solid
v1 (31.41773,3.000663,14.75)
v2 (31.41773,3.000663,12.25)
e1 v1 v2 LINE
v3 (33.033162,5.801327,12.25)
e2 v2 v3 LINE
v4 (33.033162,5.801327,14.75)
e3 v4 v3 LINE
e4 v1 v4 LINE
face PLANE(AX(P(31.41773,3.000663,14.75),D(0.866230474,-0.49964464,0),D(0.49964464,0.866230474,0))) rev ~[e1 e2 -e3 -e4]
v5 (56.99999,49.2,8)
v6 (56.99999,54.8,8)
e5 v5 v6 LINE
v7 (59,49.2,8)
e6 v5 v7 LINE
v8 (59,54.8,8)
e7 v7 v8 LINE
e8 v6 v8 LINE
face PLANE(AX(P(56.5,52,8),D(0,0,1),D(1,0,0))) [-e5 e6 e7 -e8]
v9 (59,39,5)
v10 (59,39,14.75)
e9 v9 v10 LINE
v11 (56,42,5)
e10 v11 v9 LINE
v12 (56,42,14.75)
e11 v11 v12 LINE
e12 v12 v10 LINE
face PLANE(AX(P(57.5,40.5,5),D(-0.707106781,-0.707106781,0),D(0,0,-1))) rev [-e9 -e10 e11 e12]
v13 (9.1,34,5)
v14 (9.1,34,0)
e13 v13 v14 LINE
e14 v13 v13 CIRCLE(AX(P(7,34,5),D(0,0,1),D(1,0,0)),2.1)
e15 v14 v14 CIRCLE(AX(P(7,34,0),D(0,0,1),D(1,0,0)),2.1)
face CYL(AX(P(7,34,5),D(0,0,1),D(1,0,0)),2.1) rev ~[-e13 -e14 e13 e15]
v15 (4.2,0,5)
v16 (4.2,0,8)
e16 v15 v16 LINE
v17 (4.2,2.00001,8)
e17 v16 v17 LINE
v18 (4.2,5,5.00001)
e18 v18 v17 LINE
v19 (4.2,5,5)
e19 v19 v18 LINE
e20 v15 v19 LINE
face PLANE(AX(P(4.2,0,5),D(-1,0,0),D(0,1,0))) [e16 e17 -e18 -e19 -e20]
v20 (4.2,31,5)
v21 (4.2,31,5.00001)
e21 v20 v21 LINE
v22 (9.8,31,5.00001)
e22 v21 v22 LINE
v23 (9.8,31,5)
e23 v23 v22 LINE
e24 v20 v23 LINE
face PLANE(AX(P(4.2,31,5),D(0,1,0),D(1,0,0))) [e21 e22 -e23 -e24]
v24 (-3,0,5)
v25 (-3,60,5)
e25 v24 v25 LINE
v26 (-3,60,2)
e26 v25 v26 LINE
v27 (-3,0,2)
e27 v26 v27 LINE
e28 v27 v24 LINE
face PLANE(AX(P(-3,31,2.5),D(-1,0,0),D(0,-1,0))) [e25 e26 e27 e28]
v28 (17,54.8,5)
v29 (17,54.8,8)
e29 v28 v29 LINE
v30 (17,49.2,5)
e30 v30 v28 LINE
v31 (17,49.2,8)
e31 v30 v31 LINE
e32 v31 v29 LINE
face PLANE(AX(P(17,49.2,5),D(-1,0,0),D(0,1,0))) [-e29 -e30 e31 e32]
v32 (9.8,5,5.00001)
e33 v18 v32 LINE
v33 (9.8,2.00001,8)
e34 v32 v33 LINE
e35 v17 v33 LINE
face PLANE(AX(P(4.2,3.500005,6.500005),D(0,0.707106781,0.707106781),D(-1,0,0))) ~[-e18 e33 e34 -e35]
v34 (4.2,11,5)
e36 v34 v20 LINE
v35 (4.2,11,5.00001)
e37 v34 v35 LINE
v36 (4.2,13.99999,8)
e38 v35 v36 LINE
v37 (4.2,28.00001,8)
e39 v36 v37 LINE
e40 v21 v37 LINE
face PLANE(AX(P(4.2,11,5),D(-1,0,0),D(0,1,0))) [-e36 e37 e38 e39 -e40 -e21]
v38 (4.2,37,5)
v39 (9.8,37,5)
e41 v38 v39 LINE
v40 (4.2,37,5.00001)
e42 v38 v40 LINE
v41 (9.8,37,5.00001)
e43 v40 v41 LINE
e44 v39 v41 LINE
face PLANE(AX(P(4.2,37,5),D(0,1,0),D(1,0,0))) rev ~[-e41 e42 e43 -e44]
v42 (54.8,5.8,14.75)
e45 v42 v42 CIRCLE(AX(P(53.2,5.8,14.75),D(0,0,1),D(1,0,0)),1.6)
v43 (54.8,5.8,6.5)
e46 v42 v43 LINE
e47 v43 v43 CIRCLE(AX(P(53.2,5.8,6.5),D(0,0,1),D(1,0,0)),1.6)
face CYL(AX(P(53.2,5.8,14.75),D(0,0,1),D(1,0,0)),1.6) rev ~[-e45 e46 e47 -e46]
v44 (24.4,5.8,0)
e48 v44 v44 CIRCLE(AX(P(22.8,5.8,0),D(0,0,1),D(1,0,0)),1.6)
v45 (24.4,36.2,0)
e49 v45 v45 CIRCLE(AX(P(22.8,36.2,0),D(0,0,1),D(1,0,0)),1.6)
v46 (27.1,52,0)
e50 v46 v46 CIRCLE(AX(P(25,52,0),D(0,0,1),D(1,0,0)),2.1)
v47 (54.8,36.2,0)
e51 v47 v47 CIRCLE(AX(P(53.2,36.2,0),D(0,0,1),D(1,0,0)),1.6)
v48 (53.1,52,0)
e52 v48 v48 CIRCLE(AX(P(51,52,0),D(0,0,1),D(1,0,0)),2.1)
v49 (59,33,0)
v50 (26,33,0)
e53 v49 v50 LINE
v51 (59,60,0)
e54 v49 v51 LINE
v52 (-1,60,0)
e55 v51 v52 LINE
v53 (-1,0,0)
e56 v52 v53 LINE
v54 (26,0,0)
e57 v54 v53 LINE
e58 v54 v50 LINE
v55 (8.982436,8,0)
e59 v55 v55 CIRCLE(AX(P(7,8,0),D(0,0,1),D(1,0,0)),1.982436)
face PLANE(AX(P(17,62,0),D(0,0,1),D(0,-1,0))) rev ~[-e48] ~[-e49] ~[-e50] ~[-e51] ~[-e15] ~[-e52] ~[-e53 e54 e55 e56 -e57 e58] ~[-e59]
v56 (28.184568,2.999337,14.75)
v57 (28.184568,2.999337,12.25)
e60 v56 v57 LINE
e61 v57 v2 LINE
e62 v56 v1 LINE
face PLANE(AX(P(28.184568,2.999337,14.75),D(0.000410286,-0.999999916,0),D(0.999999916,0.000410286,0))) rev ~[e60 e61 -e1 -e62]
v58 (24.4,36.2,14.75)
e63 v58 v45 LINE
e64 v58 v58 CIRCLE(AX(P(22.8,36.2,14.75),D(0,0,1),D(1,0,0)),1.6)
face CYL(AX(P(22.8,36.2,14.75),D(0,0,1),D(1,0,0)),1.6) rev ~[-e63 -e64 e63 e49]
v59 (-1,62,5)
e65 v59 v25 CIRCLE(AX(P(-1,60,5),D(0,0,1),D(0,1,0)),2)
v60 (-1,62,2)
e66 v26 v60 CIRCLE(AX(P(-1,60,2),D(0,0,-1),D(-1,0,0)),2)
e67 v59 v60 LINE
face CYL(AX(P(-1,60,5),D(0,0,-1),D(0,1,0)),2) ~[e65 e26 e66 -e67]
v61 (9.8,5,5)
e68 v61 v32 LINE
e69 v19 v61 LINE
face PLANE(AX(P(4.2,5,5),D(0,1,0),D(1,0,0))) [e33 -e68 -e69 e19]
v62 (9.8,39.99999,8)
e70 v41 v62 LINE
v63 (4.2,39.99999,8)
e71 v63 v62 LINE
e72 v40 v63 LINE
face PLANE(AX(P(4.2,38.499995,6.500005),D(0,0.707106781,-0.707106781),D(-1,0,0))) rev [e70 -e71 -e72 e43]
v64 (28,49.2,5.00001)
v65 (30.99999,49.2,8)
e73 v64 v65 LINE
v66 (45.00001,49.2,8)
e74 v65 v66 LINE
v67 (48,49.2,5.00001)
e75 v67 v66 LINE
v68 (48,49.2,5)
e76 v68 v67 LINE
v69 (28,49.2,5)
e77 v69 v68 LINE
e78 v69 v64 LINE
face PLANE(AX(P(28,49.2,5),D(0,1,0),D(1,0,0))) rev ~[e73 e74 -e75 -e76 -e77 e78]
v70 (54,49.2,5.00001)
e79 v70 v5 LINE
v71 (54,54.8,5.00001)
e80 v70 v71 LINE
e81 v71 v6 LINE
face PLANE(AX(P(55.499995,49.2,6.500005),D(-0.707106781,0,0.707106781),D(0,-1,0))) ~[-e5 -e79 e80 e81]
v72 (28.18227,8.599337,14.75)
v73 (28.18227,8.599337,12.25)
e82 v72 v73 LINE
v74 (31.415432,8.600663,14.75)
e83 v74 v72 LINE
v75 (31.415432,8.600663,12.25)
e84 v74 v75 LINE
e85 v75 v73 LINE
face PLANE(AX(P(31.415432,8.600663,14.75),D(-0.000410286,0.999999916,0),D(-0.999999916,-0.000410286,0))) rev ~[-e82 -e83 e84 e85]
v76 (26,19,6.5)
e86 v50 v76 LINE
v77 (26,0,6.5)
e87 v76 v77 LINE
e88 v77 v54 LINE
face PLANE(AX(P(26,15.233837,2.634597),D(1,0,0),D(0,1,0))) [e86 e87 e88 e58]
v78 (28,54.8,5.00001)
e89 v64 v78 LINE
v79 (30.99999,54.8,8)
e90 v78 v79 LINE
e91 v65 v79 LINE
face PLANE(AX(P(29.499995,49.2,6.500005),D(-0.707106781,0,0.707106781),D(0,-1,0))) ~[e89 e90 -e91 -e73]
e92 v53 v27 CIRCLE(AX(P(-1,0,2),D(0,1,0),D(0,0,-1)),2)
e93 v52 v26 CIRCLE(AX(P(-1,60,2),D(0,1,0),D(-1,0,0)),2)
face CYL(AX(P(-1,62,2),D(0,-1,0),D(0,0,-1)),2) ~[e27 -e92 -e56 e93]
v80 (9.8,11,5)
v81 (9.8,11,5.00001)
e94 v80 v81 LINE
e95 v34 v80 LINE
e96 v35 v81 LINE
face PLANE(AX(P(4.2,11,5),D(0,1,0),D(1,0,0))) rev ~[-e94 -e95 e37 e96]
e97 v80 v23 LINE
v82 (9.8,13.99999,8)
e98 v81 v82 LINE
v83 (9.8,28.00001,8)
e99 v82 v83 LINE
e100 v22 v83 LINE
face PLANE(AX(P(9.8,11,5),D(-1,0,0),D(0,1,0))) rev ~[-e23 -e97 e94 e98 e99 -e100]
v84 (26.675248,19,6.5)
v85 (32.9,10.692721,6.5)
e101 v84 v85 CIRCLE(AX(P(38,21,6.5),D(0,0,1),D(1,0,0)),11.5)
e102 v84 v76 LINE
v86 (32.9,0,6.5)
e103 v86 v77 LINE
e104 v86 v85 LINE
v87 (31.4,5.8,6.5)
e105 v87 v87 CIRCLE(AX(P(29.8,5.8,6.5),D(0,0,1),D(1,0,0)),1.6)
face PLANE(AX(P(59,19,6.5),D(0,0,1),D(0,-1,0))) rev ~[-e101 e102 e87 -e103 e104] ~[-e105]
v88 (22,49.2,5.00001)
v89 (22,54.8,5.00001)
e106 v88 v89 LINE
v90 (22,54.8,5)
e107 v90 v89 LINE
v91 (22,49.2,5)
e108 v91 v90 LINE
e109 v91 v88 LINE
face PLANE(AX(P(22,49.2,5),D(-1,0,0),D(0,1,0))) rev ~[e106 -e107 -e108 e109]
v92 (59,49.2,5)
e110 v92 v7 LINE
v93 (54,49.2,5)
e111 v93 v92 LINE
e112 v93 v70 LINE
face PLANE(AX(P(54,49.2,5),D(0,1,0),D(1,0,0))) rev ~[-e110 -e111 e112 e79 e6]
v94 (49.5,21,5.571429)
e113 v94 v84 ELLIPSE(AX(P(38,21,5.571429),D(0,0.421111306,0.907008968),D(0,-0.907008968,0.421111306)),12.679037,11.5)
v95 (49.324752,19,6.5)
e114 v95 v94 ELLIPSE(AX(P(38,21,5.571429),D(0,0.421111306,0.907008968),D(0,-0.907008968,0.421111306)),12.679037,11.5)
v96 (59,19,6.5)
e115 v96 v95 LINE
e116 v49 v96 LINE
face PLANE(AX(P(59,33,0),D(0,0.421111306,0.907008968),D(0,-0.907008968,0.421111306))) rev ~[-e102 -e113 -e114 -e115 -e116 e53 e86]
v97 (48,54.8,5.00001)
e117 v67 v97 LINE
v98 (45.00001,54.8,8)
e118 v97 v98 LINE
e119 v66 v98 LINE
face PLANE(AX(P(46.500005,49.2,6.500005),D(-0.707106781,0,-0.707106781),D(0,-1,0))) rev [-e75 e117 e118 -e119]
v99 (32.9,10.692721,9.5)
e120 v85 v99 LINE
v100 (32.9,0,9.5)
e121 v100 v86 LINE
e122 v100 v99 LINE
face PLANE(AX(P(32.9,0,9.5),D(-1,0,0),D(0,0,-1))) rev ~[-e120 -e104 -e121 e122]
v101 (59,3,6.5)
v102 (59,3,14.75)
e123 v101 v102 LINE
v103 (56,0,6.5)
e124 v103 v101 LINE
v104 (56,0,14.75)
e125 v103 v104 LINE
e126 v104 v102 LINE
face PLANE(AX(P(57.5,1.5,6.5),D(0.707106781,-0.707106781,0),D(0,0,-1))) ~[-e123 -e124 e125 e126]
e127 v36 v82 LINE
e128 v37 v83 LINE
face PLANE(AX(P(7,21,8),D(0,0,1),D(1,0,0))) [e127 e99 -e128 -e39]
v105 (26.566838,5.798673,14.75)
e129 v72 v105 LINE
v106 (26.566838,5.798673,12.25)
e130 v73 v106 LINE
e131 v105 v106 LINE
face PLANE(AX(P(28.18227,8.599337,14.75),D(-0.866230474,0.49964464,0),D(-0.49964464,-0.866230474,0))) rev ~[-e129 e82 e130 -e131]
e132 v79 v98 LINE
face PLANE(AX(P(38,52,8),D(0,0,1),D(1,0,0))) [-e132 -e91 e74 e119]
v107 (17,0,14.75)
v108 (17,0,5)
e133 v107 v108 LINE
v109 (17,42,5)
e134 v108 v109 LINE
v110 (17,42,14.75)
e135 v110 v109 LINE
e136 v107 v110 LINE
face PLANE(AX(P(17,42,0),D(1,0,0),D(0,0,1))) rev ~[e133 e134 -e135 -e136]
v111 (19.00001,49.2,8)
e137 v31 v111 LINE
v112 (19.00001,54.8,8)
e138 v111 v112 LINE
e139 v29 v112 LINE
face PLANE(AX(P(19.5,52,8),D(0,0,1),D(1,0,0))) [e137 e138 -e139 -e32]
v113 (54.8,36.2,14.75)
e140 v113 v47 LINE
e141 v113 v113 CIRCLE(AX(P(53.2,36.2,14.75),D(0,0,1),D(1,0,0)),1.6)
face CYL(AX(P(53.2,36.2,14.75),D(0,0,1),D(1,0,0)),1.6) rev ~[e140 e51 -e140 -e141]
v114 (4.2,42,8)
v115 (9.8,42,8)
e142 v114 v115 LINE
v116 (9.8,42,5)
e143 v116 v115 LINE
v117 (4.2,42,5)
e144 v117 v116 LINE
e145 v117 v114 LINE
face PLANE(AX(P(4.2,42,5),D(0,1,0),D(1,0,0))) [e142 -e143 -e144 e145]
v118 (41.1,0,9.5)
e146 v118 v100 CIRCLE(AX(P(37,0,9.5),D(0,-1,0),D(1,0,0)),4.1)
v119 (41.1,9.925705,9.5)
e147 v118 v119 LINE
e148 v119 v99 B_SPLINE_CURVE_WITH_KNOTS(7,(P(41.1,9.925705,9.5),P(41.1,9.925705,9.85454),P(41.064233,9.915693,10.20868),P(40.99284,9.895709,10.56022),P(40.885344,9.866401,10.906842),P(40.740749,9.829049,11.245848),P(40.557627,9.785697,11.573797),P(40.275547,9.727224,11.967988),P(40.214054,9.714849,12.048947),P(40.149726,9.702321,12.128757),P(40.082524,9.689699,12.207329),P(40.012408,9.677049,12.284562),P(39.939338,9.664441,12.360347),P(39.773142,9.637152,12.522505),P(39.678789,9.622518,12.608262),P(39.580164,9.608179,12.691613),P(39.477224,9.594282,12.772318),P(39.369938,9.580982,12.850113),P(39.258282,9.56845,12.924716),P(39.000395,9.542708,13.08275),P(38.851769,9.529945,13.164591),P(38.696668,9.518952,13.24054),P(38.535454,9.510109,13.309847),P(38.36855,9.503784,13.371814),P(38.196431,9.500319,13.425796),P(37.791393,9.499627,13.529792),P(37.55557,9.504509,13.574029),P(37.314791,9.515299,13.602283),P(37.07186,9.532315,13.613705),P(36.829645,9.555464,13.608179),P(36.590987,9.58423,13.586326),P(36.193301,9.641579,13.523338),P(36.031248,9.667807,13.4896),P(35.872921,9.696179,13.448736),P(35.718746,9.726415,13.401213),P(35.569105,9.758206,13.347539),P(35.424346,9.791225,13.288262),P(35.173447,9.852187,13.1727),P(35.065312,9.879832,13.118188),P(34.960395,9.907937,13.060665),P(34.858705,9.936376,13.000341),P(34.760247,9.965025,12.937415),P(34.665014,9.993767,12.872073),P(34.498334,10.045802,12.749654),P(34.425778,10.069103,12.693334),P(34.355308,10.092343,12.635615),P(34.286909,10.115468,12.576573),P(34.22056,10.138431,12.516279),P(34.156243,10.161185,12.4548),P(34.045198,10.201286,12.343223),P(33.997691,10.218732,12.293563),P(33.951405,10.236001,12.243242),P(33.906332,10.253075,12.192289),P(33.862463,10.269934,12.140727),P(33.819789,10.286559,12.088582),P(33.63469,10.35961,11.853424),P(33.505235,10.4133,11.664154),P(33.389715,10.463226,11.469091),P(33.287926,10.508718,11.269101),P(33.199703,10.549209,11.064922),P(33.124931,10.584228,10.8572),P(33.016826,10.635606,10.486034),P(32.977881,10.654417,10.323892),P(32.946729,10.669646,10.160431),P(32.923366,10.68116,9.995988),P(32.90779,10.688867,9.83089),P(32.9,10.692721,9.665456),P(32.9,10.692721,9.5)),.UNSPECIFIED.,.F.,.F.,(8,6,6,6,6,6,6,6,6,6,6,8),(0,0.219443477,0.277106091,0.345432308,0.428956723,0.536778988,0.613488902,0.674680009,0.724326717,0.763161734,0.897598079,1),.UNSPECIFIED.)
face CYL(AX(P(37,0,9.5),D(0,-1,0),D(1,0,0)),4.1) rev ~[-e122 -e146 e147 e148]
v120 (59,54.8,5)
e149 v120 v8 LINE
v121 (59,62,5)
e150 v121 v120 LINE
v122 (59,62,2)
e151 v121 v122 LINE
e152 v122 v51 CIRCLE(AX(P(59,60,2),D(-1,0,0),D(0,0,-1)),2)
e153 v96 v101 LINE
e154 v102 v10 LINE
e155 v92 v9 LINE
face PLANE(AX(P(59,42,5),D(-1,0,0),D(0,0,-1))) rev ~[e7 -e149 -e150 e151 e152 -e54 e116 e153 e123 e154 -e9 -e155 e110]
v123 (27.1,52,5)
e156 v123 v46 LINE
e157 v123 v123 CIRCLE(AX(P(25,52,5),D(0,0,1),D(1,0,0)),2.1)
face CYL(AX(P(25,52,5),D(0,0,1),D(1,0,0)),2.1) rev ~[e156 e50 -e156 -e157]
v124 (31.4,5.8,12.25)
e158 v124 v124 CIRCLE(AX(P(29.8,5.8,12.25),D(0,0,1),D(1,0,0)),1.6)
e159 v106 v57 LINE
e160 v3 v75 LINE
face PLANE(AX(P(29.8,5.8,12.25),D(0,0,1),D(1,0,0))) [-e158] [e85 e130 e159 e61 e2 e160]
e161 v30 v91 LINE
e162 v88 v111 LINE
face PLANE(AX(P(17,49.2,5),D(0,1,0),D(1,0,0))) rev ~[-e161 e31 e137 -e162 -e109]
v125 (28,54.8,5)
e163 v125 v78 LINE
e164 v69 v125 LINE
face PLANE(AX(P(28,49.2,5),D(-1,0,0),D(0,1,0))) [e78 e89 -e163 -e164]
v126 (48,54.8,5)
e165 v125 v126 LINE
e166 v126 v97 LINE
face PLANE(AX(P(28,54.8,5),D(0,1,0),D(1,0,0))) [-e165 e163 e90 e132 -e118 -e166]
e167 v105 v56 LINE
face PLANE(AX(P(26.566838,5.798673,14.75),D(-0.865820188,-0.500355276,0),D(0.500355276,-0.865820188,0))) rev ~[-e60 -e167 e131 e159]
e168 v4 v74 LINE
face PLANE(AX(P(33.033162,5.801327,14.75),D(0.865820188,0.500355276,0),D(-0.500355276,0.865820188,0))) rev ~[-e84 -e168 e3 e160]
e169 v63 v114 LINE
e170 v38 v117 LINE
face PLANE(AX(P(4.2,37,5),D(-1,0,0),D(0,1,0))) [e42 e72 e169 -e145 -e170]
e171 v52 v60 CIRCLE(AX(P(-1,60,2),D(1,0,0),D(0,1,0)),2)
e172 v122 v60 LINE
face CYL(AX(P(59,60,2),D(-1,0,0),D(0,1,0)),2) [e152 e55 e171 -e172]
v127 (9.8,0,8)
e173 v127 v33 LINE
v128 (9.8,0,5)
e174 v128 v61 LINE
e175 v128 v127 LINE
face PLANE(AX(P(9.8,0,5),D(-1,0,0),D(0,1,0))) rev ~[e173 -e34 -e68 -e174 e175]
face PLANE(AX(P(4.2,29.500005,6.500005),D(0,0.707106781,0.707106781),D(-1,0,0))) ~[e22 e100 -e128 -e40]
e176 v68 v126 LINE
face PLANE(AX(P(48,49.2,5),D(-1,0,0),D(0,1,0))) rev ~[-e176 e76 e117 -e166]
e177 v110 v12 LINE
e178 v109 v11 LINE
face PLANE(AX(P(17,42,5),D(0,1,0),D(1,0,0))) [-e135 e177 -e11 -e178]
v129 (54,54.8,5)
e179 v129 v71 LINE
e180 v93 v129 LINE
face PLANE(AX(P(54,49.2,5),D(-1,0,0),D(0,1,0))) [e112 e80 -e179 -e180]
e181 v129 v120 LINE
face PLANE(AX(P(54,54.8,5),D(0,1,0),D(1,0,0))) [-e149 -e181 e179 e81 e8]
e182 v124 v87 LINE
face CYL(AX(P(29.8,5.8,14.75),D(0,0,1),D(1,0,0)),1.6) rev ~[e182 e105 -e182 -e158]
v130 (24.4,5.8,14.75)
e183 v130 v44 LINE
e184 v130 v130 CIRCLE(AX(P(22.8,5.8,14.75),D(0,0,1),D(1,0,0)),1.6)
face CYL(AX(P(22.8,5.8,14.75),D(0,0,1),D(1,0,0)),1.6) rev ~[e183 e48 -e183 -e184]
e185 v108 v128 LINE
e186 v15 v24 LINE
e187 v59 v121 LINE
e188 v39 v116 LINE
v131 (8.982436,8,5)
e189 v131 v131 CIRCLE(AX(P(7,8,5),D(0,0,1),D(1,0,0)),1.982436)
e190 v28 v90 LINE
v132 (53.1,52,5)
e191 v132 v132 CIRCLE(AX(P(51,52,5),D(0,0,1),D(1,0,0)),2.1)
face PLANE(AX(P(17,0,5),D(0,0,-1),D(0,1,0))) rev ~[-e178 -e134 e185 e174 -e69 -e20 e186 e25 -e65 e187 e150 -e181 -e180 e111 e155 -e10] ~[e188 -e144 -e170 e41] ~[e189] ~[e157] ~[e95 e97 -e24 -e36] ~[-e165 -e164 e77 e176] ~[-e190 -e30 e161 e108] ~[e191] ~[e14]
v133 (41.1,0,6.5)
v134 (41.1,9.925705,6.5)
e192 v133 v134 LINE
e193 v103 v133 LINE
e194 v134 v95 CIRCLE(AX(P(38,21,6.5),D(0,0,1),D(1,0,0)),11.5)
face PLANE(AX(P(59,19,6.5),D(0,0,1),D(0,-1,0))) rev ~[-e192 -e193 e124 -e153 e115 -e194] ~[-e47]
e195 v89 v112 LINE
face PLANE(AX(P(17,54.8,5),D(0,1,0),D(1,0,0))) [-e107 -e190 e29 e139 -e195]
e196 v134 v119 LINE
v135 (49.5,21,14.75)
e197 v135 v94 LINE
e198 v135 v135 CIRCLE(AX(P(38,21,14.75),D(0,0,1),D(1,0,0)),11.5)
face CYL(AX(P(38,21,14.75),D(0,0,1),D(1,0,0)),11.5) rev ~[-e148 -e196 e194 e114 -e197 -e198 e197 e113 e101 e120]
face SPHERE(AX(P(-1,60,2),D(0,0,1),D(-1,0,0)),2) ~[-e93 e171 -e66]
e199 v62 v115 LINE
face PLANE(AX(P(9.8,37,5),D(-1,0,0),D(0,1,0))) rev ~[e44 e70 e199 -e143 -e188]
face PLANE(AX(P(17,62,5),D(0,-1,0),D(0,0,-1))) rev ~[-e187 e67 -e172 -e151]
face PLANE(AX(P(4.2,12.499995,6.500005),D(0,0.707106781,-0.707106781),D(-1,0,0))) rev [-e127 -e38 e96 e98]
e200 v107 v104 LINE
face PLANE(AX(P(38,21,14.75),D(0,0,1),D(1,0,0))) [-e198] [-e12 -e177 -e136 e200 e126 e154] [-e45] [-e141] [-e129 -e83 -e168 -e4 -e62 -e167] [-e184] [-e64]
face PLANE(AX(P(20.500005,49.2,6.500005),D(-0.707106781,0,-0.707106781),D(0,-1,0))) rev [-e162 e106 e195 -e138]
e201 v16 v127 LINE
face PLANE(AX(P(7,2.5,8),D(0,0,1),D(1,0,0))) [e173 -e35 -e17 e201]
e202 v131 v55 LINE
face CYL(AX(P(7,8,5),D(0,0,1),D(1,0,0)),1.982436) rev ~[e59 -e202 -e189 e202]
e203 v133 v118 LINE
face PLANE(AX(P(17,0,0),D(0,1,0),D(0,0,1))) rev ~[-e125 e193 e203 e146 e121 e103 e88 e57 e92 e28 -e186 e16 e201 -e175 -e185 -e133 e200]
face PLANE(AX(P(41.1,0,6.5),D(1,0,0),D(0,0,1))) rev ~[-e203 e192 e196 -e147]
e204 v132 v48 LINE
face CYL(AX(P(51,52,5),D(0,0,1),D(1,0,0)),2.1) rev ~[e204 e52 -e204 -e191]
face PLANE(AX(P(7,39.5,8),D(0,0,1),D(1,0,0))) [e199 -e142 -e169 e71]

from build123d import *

# Parameters (mm, degrees)
F0_W      = 59
F0_H      = 54
F1_DEPTH  = 5
F2_W      = 42
F2_H      = 42
F3_DEPTH  = 9.75
F5_DEPTH  = 33
F6_R      = 1.6
F6_R_2    = 11.5
F7_DEPTH  = 14.751
F8_SIZE   = 3
F9_R      = 1.6
F10_DEPTH = 2.5
F12_DEPTH = 10.6937211186
F14_DEPTH = 5.001
F16_DEPTH = 20
F18_DEPTH = 20
F19_R     = 2
F20_W     = 5.6
F20_H     = 20
F20_H_2   = 5
F20_W_2   = 5
F20_H_3   = 5.6
F20_W_3   = 20
F21_DEPTH = 3
F22_SIZE  = 2.99999
F23_R     = 1.9824364908
F23_R_2   = 2.1
F24_DEPTH = 5.001


# Not quite as in the source:
# - a fillet or chamfer is up to 0.001 mm smaller than in the source, because OpenCascade refuses the exact size


with BuildPart() as f1:
    # F0 (on Top) → F1 (new body)
    with BuildSketch(Plane.XY):
        with Locations((29.5, 27)):
            Rectangle(F0_W, F0_H)
    extrude(amount=F1_DEPTH)

    # F2 (on face) → F3 (join)
    with BuildSketch(Plane.XY.offset(5)):
        with Locations((38, 21)):
            Rectangle(F2_W, F2_H)
    extrude(amount=F3_DEPTH)

    # F4 (on face) → F5 (cut)
    with BuildSketch(Plane.YZ.offset(59)):
        Polygon((0, 6.5), (0, 0), (33, 0), (19, 6.5), align=None)
    extrude(amount=-F5_DEPTH, mode=Mode.SUBTRACT)

    # F6 (on face) → F7 (cut, through all)
    with BuildSketch(Plane.XY.offset(14.75)):
        with Locations((22.8, 36.2)):
            Circle(F6_R)
        with Locations((38, 21)):
            Circle(F6_R_2)
        with Locations((53.2, 36.2)):
            Circle(F6_R)
        with Locations((22.8, 5.8)):
            Circle(F6_R)
        with Locations((53.2, 5.8)):
            Circle(F6_R)
        with Locations((29.8, 5.8)):
            Circle(F6_R)
    extrude(amount=-F7_DEPTH, mode=Mode.SUBTRACT)

    # F8
    f8_edges = [f1.edges().sort_by_distance(p)[0] for p in [
        (59, 42, 9.875),
        (59, 0, 10.625),
    ]]
    chamfer(f8_edges, length=F8_SIZE)

    # F9 (on face) → F10 (cut)
    with BuildSketch(Plane.XY.offset(14.75)):
        Polygon((31.417729554, 3.0006632601), (33.0331615075, 5.8013265202), (31.4154319535, 8.6006632601), (28.182270446, 8.5993367399), (26.5668384925, 5.7986734798), (28.1845680465, 2.9993367399), align=None)
        with Locations((29.8, 5.8)):
            Circle(F9_R, mode=Mode.SUBTRACT)
    extrude(amount=-F10_DEPTH, mode=Mode.SUBTRACT)

    # F11 (on face) → F12 (cut, through all)
    with BuildSketch(Plane.XZ):
        with BuildLine():
            Line((32.9, 9.5), (32.9, 6.5))
            Line((32.9, 6.5), (41.1, 6.5))
            Line((41.1, 6.5), (41.1, 9.5))
            ThreePointArc((41.1, 9.5), (37, 13.6), (32.9, 9.5))
        make_face()
    extrude(amount=-F12_DEPTH, mode=Mode.SUBTRACT)

    # F13 (on face) → F14 (cut, through all)
    with BuildSketch(Plane.XY.offset(5)):
        Polygon((17, 42), (56, 42), (59, 42), (59, 54), (0, 54), (0, 0), (17, 0), align=None)
    extrude(amount=-F14_DEPTH, mode=Mode.SUBTRACT)

    # F15 (on face) → F16 (join)
    with BuildSketch(Plane(origin=(0, 42, 0), x_dir=(-1, 0, 0), z_dir=(0, 1, 0))):
        Polygon((-56, 5), (-59, 5), (-59, 0), (-17, 0), (-17, 5), align=None)
    extrude(amount=F16_DEPTH)

    # F17 (on face) → F18 (join)
    with BuildSketch(Plane(origin=(17, 0, 0), x_dir=(0, -1, 0), z_dir=(-1, 0, 0))):
        Polygon((-42, 5), (-62, 5), (-62, 0), (0, 0), (0, 5), align=None)
    extrude(amount=F18_DEPTH)

    # F19
    f19_edges = [f1.edges().sort_by_distance(p)[0] for p in [
        (-3, 62, 2.5),
        (-3, 31, 0),
        (28, 62, 0),
    ]]
    fillet(f19_edges, radius=F19_R)

    # F20 (on face) → F21 (join)
    with BuildSketch(Plane.XY.offset(5)):
        with Locations((7, 21)):
            Rectangle(F20_W, F20_H)
        with Locations((7, 39.5)):
            Rectangle(F20_W, F20_H_2)
        with Locations((7, 2.5)):
            Rectangle(F20_W, F20_H_2)
        with Locations((19.5, 52)):
            Rectangle(F20_W_2, F20_H_3)
        with Locations((38, 52)):
            Rectangle(F20_W_3, F20_H_3)
        with Locations((56.5, 52)):
            Rectangle(F20_W_2, F20_H_3)
    extrude(amount=F21_DEPTH)

    # F22 (size 3 in the source; OpenCascade refuses exactly that, so slightly less here)
    f22_edges = [f1.edges().sort_by_distance(p)[0] for p in [
        (54, 52, 8),
        (48, 52, 8),
        (28, 52, 8),
        (22, 52, 8),
        (7, 37, 8),
        (7, 31, 8),
        (7, 11, 8),
        (7, 5, 8),
    ]]
    chamfer(f22_edges, length=F22_SIZE)

    # F23 (on face) → F24 (cut, through all)
    with BuildSketch(Plane.XY.offset(5)):
        with Locations((7, 8)):
            Circle(F23_R)
        with Locations((7, 34)):
            Circle(F23_R_2)
        with Locations((25, 52)):
            Circle(F23_R_2)
        with Locations((51, 52)):
            Circle(F23_R_2)
    extrude(amount=-F24_DEPTH, mode=Mode.SUBTRACT)


solid = f1.part
